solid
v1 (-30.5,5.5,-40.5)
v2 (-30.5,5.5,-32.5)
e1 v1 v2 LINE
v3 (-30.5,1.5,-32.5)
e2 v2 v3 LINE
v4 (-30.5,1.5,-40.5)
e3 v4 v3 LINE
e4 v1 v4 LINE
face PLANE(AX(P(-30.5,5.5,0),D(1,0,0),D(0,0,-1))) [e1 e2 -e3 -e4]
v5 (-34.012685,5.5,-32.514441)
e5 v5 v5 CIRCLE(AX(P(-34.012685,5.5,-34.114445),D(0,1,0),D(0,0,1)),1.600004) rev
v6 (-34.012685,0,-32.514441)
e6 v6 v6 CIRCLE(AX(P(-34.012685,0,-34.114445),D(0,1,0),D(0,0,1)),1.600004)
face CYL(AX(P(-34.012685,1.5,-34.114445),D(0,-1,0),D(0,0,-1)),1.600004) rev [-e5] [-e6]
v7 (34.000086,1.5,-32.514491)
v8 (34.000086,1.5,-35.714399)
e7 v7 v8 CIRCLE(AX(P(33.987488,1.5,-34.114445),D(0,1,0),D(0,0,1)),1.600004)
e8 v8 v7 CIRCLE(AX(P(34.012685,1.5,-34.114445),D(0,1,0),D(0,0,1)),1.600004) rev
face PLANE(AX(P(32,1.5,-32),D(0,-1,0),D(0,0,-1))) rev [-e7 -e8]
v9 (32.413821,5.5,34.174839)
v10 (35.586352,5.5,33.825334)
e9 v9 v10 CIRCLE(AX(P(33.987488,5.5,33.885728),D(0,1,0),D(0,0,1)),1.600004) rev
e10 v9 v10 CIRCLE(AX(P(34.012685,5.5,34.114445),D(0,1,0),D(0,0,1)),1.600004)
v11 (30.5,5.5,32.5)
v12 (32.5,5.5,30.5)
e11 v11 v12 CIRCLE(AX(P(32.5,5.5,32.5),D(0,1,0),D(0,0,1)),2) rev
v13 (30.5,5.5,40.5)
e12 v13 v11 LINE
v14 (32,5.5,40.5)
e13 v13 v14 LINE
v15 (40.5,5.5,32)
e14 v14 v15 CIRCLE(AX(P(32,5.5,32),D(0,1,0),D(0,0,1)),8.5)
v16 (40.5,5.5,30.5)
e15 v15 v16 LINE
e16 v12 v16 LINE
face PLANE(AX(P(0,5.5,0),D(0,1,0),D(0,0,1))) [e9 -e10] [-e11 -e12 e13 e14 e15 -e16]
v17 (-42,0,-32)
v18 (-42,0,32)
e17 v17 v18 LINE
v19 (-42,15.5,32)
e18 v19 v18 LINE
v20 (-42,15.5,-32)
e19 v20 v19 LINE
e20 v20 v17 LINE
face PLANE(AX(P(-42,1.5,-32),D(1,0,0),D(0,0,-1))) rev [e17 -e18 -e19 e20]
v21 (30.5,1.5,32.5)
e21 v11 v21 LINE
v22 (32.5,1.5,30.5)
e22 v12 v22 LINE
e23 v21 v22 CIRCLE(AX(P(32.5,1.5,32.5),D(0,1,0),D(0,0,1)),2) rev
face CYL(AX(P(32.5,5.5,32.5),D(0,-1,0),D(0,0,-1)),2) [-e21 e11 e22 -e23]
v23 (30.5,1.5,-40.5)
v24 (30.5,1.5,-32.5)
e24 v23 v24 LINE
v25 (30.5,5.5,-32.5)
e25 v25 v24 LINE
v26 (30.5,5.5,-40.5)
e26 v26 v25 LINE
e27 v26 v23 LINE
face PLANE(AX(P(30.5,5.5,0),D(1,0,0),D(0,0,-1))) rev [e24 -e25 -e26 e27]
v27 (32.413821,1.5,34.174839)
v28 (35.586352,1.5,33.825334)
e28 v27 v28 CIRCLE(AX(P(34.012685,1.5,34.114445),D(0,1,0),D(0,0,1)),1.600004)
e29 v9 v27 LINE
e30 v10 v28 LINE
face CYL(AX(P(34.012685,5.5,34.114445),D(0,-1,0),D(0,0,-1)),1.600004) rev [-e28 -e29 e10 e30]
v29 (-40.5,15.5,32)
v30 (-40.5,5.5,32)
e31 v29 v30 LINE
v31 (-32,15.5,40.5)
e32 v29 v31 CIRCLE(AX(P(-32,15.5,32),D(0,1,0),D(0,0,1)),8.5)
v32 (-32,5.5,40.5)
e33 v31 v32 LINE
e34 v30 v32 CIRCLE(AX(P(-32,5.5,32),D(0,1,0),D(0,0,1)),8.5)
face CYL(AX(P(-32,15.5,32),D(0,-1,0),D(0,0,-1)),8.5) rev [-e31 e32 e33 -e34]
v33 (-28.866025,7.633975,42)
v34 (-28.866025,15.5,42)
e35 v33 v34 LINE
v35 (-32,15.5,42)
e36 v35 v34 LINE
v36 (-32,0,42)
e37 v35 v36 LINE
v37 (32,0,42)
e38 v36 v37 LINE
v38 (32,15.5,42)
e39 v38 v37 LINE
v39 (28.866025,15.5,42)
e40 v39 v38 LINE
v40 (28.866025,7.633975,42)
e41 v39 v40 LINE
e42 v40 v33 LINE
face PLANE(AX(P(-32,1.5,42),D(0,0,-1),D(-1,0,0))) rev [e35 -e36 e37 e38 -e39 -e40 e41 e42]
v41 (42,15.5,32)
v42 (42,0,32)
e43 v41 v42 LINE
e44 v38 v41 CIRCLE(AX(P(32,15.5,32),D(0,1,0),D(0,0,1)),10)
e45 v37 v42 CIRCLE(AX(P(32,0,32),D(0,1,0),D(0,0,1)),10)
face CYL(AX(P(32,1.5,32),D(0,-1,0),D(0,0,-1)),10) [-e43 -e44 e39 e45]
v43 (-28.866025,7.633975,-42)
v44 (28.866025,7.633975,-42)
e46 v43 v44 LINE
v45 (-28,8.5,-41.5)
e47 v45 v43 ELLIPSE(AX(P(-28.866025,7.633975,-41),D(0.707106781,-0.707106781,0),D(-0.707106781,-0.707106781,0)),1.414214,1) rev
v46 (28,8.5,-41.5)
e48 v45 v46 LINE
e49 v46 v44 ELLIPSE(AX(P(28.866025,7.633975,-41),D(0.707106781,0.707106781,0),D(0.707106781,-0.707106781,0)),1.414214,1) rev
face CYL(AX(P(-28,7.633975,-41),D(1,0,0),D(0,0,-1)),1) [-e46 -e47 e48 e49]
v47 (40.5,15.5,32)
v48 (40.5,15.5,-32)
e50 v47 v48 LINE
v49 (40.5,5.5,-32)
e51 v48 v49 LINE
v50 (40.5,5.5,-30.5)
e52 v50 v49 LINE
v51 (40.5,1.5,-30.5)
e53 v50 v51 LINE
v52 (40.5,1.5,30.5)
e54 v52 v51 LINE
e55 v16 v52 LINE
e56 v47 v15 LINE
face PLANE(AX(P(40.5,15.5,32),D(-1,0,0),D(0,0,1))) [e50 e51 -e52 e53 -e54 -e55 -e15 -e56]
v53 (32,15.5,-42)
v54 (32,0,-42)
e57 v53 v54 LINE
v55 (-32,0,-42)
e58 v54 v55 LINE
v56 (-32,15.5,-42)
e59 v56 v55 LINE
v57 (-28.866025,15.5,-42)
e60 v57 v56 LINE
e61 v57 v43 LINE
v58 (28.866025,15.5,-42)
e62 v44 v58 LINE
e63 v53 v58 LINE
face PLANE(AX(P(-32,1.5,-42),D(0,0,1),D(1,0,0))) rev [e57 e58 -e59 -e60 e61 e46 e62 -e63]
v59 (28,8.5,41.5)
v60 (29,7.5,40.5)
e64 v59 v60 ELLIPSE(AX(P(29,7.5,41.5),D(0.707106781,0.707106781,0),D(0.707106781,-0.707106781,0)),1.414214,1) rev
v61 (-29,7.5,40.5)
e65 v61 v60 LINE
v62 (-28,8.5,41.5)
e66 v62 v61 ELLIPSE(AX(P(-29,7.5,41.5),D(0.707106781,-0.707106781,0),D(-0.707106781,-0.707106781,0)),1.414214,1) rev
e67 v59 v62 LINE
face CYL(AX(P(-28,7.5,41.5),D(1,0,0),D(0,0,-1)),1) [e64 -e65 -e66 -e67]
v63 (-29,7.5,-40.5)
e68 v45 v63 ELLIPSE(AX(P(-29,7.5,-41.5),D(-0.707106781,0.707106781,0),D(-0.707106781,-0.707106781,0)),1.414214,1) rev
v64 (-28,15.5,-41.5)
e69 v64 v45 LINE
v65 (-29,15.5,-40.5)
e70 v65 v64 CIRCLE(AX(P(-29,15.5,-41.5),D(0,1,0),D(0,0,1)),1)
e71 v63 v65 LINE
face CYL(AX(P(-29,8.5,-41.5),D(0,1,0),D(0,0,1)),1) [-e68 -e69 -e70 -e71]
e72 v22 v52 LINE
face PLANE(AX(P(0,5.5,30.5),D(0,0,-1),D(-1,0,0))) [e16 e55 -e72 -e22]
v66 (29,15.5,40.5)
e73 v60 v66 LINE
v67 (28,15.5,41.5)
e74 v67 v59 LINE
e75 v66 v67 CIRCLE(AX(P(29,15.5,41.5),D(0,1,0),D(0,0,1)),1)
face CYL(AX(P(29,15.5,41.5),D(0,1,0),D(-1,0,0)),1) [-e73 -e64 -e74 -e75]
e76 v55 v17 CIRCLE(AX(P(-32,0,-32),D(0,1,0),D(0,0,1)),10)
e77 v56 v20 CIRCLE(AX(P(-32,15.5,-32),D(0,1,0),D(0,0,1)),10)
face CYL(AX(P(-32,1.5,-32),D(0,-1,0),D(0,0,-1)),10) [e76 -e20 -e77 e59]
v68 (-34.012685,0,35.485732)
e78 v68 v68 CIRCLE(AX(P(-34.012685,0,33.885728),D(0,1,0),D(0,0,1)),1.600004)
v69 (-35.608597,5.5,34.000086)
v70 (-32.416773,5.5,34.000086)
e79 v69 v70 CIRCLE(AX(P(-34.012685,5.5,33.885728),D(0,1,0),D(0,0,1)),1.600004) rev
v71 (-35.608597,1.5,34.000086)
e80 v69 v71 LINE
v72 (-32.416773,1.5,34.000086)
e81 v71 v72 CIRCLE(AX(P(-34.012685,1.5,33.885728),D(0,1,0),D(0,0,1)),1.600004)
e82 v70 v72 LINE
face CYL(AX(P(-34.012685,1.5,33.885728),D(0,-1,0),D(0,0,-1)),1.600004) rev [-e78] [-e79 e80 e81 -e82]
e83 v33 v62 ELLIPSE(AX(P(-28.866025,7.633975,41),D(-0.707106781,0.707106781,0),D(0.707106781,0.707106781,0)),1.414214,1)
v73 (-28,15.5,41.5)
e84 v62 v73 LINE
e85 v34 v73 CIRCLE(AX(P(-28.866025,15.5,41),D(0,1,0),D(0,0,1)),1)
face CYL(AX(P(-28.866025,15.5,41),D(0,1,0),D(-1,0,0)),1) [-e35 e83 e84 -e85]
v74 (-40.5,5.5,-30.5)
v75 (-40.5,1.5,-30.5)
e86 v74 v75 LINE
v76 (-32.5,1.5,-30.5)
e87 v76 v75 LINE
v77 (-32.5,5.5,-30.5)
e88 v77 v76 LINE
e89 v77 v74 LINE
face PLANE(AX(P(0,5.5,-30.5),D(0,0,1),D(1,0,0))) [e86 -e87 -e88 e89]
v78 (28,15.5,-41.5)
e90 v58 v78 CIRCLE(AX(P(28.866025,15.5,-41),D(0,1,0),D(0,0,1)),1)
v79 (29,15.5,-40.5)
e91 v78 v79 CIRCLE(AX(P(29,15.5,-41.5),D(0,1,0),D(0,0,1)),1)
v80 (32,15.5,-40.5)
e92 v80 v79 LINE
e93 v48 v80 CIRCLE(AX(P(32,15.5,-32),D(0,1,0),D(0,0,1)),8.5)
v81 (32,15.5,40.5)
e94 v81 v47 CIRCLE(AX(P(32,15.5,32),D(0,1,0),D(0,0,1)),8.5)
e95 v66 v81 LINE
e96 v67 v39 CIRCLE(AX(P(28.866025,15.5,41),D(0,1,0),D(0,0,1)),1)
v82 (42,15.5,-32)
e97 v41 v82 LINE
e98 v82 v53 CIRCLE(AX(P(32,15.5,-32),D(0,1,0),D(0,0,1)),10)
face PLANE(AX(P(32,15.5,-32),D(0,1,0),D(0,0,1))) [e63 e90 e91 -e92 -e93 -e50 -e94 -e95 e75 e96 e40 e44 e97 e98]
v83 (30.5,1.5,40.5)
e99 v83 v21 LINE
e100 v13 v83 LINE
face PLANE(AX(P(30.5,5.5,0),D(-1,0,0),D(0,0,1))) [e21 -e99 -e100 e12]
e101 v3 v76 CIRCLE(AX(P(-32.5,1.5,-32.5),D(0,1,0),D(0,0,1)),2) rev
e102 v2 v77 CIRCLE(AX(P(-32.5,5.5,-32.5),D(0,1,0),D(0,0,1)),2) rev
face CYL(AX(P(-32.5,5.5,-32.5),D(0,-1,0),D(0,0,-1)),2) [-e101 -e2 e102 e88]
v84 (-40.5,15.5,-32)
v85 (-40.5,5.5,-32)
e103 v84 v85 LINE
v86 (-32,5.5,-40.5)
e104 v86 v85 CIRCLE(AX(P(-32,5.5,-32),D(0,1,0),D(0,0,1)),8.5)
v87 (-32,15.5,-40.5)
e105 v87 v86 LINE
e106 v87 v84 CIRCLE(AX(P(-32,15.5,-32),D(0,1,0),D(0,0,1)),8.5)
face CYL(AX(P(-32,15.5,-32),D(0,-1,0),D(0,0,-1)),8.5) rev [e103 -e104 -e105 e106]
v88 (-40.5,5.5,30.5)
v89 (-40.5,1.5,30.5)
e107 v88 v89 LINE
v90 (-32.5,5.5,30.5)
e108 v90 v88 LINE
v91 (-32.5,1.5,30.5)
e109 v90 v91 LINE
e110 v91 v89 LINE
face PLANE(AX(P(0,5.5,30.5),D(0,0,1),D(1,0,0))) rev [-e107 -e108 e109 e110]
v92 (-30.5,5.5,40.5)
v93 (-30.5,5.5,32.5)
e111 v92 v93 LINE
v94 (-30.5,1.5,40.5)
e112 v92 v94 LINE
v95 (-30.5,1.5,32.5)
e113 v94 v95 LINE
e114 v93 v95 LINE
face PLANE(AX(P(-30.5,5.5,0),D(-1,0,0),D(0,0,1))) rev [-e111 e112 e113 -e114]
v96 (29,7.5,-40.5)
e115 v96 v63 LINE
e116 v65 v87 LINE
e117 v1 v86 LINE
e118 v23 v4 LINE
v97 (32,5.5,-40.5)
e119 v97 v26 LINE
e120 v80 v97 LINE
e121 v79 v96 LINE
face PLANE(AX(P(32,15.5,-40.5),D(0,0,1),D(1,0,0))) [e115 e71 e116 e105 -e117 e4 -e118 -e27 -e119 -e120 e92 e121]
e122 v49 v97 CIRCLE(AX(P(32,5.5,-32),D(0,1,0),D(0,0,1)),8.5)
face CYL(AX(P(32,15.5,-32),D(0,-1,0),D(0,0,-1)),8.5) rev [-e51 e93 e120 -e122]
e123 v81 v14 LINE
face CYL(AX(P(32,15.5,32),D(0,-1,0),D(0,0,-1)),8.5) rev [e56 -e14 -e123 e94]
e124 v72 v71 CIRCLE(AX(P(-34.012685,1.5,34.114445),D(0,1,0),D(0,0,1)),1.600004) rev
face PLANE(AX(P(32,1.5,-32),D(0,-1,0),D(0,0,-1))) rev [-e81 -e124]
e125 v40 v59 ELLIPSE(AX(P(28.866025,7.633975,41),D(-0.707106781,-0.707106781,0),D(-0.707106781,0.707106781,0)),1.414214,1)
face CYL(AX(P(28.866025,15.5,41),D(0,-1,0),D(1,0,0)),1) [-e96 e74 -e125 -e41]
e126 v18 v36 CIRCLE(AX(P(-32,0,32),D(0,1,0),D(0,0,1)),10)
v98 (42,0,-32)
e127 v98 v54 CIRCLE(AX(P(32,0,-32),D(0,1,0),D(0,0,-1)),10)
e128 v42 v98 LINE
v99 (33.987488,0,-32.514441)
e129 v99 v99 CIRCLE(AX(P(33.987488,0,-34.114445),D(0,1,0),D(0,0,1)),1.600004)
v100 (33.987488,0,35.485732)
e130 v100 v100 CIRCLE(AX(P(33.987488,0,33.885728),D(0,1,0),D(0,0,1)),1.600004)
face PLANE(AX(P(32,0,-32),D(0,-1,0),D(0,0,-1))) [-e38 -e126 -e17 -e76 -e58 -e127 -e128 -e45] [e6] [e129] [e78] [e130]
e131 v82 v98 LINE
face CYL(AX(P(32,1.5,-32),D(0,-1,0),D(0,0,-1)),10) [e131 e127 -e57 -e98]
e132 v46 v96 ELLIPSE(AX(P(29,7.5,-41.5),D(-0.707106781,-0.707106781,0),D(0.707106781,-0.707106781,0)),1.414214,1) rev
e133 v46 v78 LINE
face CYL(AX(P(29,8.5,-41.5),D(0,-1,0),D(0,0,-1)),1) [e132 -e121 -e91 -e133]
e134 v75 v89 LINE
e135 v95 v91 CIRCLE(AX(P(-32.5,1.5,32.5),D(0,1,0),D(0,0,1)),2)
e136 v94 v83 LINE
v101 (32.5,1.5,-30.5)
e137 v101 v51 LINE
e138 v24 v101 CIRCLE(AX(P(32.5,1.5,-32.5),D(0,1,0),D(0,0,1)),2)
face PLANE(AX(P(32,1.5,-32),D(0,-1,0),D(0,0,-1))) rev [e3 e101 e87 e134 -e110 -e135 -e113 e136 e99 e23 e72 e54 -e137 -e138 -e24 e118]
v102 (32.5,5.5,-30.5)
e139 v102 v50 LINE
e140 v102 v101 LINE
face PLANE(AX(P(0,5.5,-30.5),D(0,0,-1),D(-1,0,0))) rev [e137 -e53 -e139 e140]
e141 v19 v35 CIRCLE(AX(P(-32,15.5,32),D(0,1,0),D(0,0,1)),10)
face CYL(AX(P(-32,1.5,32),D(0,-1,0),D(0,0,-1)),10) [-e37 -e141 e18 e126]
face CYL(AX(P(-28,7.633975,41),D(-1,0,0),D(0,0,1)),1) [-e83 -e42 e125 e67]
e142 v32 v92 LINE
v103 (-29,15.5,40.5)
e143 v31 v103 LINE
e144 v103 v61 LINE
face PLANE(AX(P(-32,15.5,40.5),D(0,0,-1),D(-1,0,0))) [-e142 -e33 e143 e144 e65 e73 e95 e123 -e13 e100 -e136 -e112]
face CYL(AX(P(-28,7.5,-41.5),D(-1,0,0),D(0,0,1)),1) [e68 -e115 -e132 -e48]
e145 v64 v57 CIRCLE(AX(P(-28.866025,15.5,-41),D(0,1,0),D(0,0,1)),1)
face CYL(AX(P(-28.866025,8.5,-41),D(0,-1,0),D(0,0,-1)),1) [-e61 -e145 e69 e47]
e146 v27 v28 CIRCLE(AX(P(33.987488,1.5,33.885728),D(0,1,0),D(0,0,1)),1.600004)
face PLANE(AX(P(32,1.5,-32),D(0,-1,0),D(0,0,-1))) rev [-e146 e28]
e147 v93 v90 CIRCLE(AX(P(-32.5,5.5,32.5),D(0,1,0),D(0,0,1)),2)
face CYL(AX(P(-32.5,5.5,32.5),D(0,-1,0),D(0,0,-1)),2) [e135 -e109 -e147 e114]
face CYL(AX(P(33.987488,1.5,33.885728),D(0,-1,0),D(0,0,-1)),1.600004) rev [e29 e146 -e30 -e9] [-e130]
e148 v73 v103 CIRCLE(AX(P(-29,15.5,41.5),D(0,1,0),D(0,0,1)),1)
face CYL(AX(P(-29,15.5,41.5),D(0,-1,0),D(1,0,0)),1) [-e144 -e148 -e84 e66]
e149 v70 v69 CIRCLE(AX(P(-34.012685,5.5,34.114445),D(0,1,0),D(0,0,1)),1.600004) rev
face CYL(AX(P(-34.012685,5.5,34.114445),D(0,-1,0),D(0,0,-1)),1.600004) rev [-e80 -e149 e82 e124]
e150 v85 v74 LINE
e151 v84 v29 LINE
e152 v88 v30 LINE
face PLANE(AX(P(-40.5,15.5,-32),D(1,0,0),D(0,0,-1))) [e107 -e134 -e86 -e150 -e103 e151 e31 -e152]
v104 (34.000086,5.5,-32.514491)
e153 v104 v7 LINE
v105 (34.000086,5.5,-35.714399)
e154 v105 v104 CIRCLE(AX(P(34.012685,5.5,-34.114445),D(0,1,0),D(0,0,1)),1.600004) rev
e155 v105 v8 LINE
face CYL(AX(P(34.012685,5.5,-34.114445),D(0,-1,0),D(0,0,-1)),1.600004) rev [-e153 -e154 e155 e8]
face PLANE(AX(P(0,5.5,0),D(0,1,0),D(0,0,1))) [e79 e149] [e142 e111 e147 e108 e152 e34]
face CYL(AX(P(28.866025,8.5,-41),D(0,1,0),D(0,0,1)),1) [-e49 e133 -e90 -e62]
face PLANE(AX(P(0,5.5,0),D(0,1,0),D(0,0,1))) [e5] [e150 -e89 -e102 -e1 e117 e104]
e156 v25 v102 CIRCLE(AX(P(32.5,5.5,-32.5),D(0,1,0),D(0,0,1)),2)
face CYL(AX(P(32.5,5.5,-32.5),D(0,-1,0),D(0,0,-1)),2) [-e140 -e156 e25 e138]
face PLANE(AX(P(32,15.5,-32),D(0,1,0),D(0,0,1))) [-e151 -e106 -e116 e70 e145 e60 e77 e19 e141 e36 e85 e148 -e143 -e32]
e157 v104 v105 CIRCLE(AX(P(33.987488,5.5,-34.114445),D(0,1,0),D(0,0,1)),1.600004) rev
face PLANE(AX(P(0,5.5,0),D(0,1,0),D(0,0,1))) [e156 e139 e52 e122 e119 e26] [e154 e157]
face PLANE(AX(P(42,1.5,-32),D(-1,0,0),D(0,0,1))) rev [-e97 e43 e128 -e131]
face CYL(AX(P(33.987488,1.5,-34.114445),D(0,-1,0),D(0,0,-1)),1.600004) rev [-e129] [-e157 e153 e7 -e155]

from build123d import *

# Parameters (mm, degrees)
EXTRUDE_1_DEPTH     = 1.5
EXTRUDE_2_DEPTH     = 14
EXTRUDE_3_OUTLINE_R = 1.60000381
EXTRUDE_3_DEPTH     = 4
SKETCH_4_W          = 56
SKETCH_4_H          = 7
CUT_EXTRUDE_1_DEPTH = 2
SKETCH_5_W          = 56
SKETCH_5_H          = 7
CUT_EXTRUDE_2_DEPTH = 2
FILLET_1_R          = 1
FILLET_2_R          = 1


with BuildPart() as part:
    # 草图1 → 凸台-拉伸1 (new body)
    with BuildSketch(Plane(origin=(0, 0, 0), x_dir=(1, 0, 0), z_dir=(0, 1, 0))):
        with BuildLine():
            Line((-32, 42), (32, 42))
            ThreePointArc((32, 42), (39.071067812, 39.071067812), (42, 32))
            Line((42, 32), (42, -32))
            ThreePointArc((42, -32), (39.071067812, -39.071067812), (32, -42))
            Line((32, -42), (-32, -42))
            ThreePointArc((-32, -42), (-39.071067812, -39.071067812), (-42, -32))
            Line((-42, -32), (-42, 32))
            ThreePointArc((-42, 32), (-39.071067812, 39.071067812), (-32, 42))
        make_face()
        with BuildLine():
            ThreePointArc((-32.412680975, -33.885727711), (-34.012684785, -32.285723901), (-35.612688595, -33.885727711))
            ThreePointArc((-35.612688595, -33.885727711), (-34.012684785, -35.485731521), (-32.412680975, -33.885727711))
        make_face(mode=Mode.SUBTRACT)
        with BuildLine():
            ThreePointArc((35.587491745, -33.885727711), (33.987487935, -32.285723901), (32.387484125, -33.885727711))
            ThreePointArc((32.387484125, -33.885727711), (33.987487935, -35.485731521), (35.587491745, -33.885727711))
        make_face(mode=Mode.SUBTRACT)
        with BuildLine():
            ThreePointArc((35.587491745, 34.114445009), (33.987487935, 35.714448819), (32.387484125, 34.114445009))
            ThreePointArc((32.387484125, 34.114445009), (33.987487935, 32.514441199), (35.587491745, 34.114445009))
        make_face(mode=Mode.SUBTRACT)
        with BuildLine():
            ThreePointArc((-32.412680975, 34.114445009), (-34.012684785, 35.714448819), (-35.612688595, 34.114445009))
            ThreePointArc((-35.612688595, 34.114445009), (-34.012684785, 32.514441199), (-32.412680975, 34.114445009))
        make_face(mode=Mode.SUBTRACT)
    extrude(amount=EXTRUDE_1_DEPTH)

    # 草图2 → 凸台-拉伸2 (add)
    with BuildSketch(Plane(origin=(0, 1.5, 0), x_dir=(1, 0, 0), z_dir=(0, 1, 0))):
        with BuildLine():
            Line((32, 42), (-32, 42))
            ThreePointArc((-32, 42), (-39.071067812, 39.071067812), (-42, 32))
            Line((-42, 32), (-42, -32))
            ThreePointArc((-42, -32), (-39.071067812, -39.071067812), (-32, -42))
            Line((-32, -42), (32, -42))
            ThreePointArc((32, -42), (39.071067812, -39.071067812), (42, -32))
            Line((42, -32), (42, 32))
            ThreePointArc((42, 32), (39.071067812, 39.071067812), (32, 42))
        make_face()
        with BuildLine():
            Line((-40.5, 32), (-40.5, -32))
            ThreePointArc((-40.5, -32), (-38.01040764, -38.01040764), (-32, -40.5))
            Line((-32, -40.5), (32, -40.5))
            ThreePointArc((32, -40.5), (38.01040764, -38.01040764), (40.5, -32))
            Line((40.5, -32), (40.5, 32))
            ThreePointArc((40.5, 32), (38.01040764, 38.01040764), (32, 40.5))
            Line((32, 40.5), (-32, 40.5))
            ThreePointArc((-32, 40.5), (-38.01040764, 38.01040764), (-40.5, 32))
        make_face(mode=Mode.SUBTRACT)
    extrude(amount=EXTRUDE_2_DEPTH)

    # 凸台-拉伸3: read off the stored shape, not the designer's step
    # 凸台-拉伸3 outline → 凸台-拉伸3 (add)
    # profile 1 of 4: a face of its own
    with BuildSketch(Plane(origin=(0, 1.5, 0), x_dir=(1, 0, 0), z_dir=(0, 1, 0))):
        with BuildLine():
            ThreePointArc((-32.5, 30.5), (-31.085786438, 31.085786438), (-30.5, 32.5))
            Line((-30.5, 32.5), (-30.5, 40.5))
            Line((-30.5, 40.5), (-32, 40.5))
            ThreePointArc((-32, 40.5), (-38.01040764, 38.01040764), (-40.5, 32))
            Line((-40.5, 32), (-40.5, 30.5))
            Line((-40.5, 30.5), (-32.5, 30.5))
        make_face()
        with Locations((-34.012684785, 34.114445009)):
            Circle(EXTRUDE_3_OUTLINE_R, mode=Mode.SUBTRACT)
    # profile 2 of 4: a face of its own
    with BuildSketch(Plane(origin=(0, 1.5, 0), x_dir=(1, 0, 0), z_dir=(0, 1, 0))):
        with BuildLine():
            Line((32, 40.5), (30.5, 40.5))
            Line((30.5, 40.5), (30.5, 32.5))
            ThreePointArc((30.5, 32.5), (31.085786438, 31.085786438), (32.5, 30.5))
            Line((32.5, 30.5), (40.5, 30.5))
            Line((40.5, 30.5), (40.5, 32))
            ThreePointArc((40.5, 32), (38.01040764, 38.01040764), (32, 40.5))
        make_face()
        with BuildLine():
            ThreePointArc((34.00008636, 32.5144908), (32.387484125, 34.114445009), (34.00008636, 35.714399218))
            ThreePointArc((34.00008636, 35.714399218), (35.612688595, 34.114445009), (34.00008636, 32.5144908))
        make_face(mode=Mode.SUBTRACT)
    # profile 3 of 4: a face of its own
    with BuildSketch(Plane(origin=(0, 1.5, 0), x_dir=(1, 0, 0), z_dir=(0, 1, 0))):
        with BuildLine():
            Line((-32.5, -30.5), (-40.5, -30.5))
            Line((-40.5, -30.5), (-40.5, -32))
            ThreePointArc((-40.5, -32), (-38.01040764, -38.01040764), (-32, -40.5))
            Line((-32, -40.5), (-30.5, -40.5))
            Line((-30.5, -40.5), (-30.5, -32.5))
            ThreePointArc((-30.5, -32.5), (-31.085786438, -31.085786438), (-32.5, -30.5))
        make_face()
        with BuildLine():
            ThreePointArc((-35.608596528, -34.00008636), (-34.012684785, -32.285723901), (-32.416773042, -34.00008636))
            ThreePointArc((-32.416773042, -34.00008636), (-34.012684785, -35.714448819), (-35.608596528, -34.00008636))
        make_face(mode=Mode.SUBTRACT)
    # profile 4 of 4: a face of its own
    with BuildSketch(Plane(origin=(0, 1.5, 0), x_dir=(1, 0, 0), z_dir=(0, 1, 0))):
        with BuildLine():
            Line((40.5, -32), (40.5, -30.5))
            Line((40.5, -30.5), (32.5, -30.5))
            ThreePointArc((32.5, -30.5), (31.085786438, -31.085786438), (30.5, -32.5))
            Line((30.5, -32.5), (30.5, -40.5))
            Line((30.5, -40.5), (32, -40.5))
            ThreePointArc((32, -40.5), (38.01040764, -38.01040764), (40.5, -32))
        make_face()
        with BuildLine():
            ThreePointArc((32.413821191, -34.174838714), (33.81228204, -32.295345654), (35.586351529, -33.825334006))
            ThreePointArc((35.586351529, -33.825334006), (34.18789068, -35.704827066), (32.413821191, -34.174838714))
        make_face(mode=Mode.SUBTRACT)
    extrude(amount=EXTRUDE_3_DEPTH)

    # 草图4 → 切除-拉伸1 (cut)
    with BuildSketch(Plane.XY.offset(42)):
        with Locations((0, 12)):
            Rectangle(SKETCH_4_W, SKETCH_4_H)
    extrude(amount=-CUT_EXTRUDE_1_DEPTH, mode=Mode.SUBTRACT)

    # 草图5 → 切除-拉伸2 (cut)
    with BuildSketch(Plane(origin=(0, 0, -42), x_dir=(-1, 0, 0), z_dir=(0, 0, -1))):
        with Locations((0, 12)):
            Rectangle(SKETCH_5_W, SKETCH_5_H)
    extrude(amount=-CUT_EXTRUDE_2_DEPTH, mode=Mode.SUBTRACT)

    # 圆角1
    fillet_1_edges = [part.edges().sort_by_distance(p)[0] for p in [
        (0, 8.5, 40.5),
        (28, 12, 40.5),
        (-28, 12, 40.5),
        (0, 8.5, -40.5),
        (-28, 12, -40.5),
        (28, 12, -40.5),
    ]]
    fillet(fillet_1_edges, radius=FILLET_1_R)

    # 圆角2
    # the kernel refuses this fillet: 1 mm, written as the material it takes off along each edge
    with BuildSketch(Plane(origin=(-28, 17.665063509, 42), x_dir=(-1, 0, 0), z_dir=(0, -1, 0))) as fillet_2_piece_1:
        with BuildLine():
            CenterArc((0.866025404, 1), FILLET_2_R, 210, 60)
            Line((0, 0.5), (-0.017320508, 0.49))
            ThreePointArc((-0.017320508, 0.49), (-0.02, 0.25), (-0.02, 0))
            Line((-0.02, 0), (0, -0.02))
            Line((0, -0.02), (0.866025404, -0.02))
            Line((0.866025404, -0.02), (0.866025404, 0))
        make_face()
    extrude(amount=9.165063509, mode=Mode.SUBTRACT)
    with BuildSketch(Plane(origin=(-28, 8.5, 42), x_dir=(0, -1, 0), z_dir=(1, 0, 0))) as fillet_2_piece_2:
        with BuildLine():
            CenterArc((0.866025404, 1), FILLET_2_R, 210, 60)
            Line((0, 0.5), (-0.017320508, 0.49))
            ThreePointArc((-0.017320508, 0.49), (-0.02, 0.25), (-0.02, 0))
            Line((-0.02, 0), (0, -0.02))
            Line((0, -0.02), (0.866025404, -0.02))
            Line((0.866025404, -0.02), (0.866025404, 0))
        make_face()
    extrude(amount=56, mode=Mode.SUBTRACT)
    with BuildSketch(Plane(origin=(28, 8.5, 42), x_dir=(0, 0, -1), z_dir=(0, 1, 0))) as fillet_2_piece_3:
        with BuildLine():
            CenterArc((1, -0.866025404), FILLET_2_R, 120, 60)
            Line((0, -0.866025404), (-0.02, -0.866025404))
            Line((-0.02, -0.866025404), (-0.02, 0))
            Line((-0.02, 0), (0, 0.02))
            ThreePointArc((0, 0.02), (0.25, 0.02), (0.49, 0.017320508))
            Line((0.49, 0.017320508), (0.5, 0))
        make_face()
    extrude(amount=9.165063509, mode=Mode.SUBTRACT)
    with BuildSketch(Plane(origin=(-28, 17.665063509, -42), x_dir=(-1, 0, 0), z_dir=(0, -1, 0)), Plane(origin=(28, 8.5, -42), x_dir=(1, 0, 0), z_dir=(0, 1, 0))) as fillet_2_piece_4:
        with BuildLine():
            CenterArc((0.866025404, -1), FILLET_2_R, 90, 60)
            Line((0, -0.5), (-0.017320508, -0.49))
            ThreePointArc((-0.017320508, -0.49), (-0.02, -0.25), (-0.02, 0))
            Line((-0.02, 0), (0, 0.02))
            Line((0, 0.02), (0.866025404, 0.02))
            Line((0.866025404, 0.02), (0.866025404, 0))
        make_face()
    extrude(amount=9.165063509, mode=Mode.SUBTRACT)
    with BuildSketch(Plane(origin=(-28, 8.5, -42), x_dir=(0, -1, 0), z_dir=(1, 0, 0))) as fillet_2_piece_5:
        with BuildLine():
            CenterArc((0.866025404, -1), FILLET_2_R, 90, 60)
            Line((0, -0.5), (-0.017320508, -0.49))
            ThreePointArc((-0.017320508, -0.49), (-0.02, -0.25), (-0.02, 0))
            Line((-0.02, 0), (0, 0.02))
            Line((0, 0.02), (0.866025404, 0.02))
            Line((0.866025404, 0.02), (0.866025404, 0))
        make_face()
    extrude(amount=56, mode=Mode.SUBTRACT)
    with BuildSketch(Plane(origin=(-28, 17.665063509, 42), x_dir=(-1, 0, 0), z_dir=(0, -1, 0))) as fillet_2_piece_6a_section:
        with BuildLine():
            CenterArc((0.866025404, 1), FILLET_2_R, 210, 60)
            Line((0, 0.5), (-0.017320508, 0.49))
            ThreePointArc((-0.017320508, 0.49), (-0.02, 0.25), (-0.02, 0))
            Line((-0.02, 0), (0, -0.02))
            Line((0, -0.02), (0.866025404, -0.02))
            Line((0.866025404, -0.02), (0.866025404, 0))
        make_face()
    fillet_2_piece_6a = extrude(amount=11.330127019, mode=Mode.PRIVATE)
    fillet_2_piece_6a = split(fillet_2_piece_6a, bisect_by=Plane(origin=(-28, 8.5, 42), z_dir=(0, -1, 0)), keep=Keep.TOP, mode=Mode.PRIVATE)
    with BuildSketch(Plane(origin=(-30.165063509, 8.5, 42), x_dir=(0, -1, 0), z_dir=(1, 0, 0))) as fillet_2_piece_6b_section:
        with BuildLine():
            CenterArc((0.866025404, 1), FILLET_2_R, 210, 60)
            Line((0, 0.5), (-0.017320508, 0.49))
            ThreePointArc((-0.017320508, 0.49), (-0.02, 0.25), (-0.02, 0))
            Line((-0.02, 0), (0, -0.02))
            Line((0, -0.02), (0.866025404, -0.02))
            Line((0.866025404, -0.02), (0.866025404, 0))
        make_face()
    fillet_2_piece_6b = extrude(amount=58.165063509, mode=Mode.PRIVATE)
    fillet_2_piece_6b = split(fillet_2_piece_6b, bisect_by=Plane(origin=(-28, 8.5, 42), z_dir=(-1, 0, 0)), keep=Keep.TOP, mode=Mode.PRIVATE)
    fillet_2_piece_6 = fillet_2_piece_6a & fillet_2_piece_6b
    add(fillet_2_piece_6, mode=Mode.SUBTRACT)
    with BuildSketch(Plane(origin=(28, 6.334936491, 42), x_dir=(0, 0, -1), z_dir=(0, 1, 0))) as fillet_2_piece_7a_section:
        with BuildLine():
            CenterArc((1, -0.866025404), FILLET_2_R, 120, 60)
            Line((0, -0.866025404), (-0.02, -0.866025404))
            Line((-0.02, -0.866025404), (-0.02, 0))
            Line((-0.02, 0), (0, 0.02))
            ThreePointArc((0, 0.02), (0.25, 0.02), (0.49, 0.017320508))
            Line((0.49, 0.017320508), (0.5, 0))
        make_face()
    fillet_2_piece_7a = extrude(amount=11.330127019, mode=Mode.PRIVATE)
    fillet_2_piece_7a = split(fillet_2_piece_7a, bisect_by=Plane(origin=(28, 8.5, 42), z_dir=(0, -1, 0)), keep=Keep.TOP, mode=Mode.PRIVATE)
    with BuildSketch(Plane(origin=(-28, 8.5, 42), x_dir=(0, -1, 0), z_dir=(1, 0, 0))) as fillet_2_piece_7b_section:
        with BuildLine():
            CenterArc((0.866025404, 1), FILLET_2_R, 210, 60)
            Line((0, 0.5), (-0.017320508, 0.49))
            ThreePointArc((-0.017320508, 0.49), (-0.02, 0.25), (-0.02, 0))
            Line((-0.02, 0), (0, -0.02))
            Line((0, -0.02), (0.866025404, -0.02))
            Line((0.866025404, -0.02), (0.866025404, 0))
        make_face()
    fillet_2_piece_7b = extrude(amount=58.165063509, mode=Mode.PRIVATE)
    fillet_2_piece_7b = split(fillet_2_piece_7b, bisect_by=Plane(origin=(28, 8.5, 42), z_dir=(1, 0, 0)), keep=Keep.TOP, mode=Mode.PRIVATE)
    fillet_2_piece_7 = fillet_2_piece_7a & fillet_2_piece_7b
    add(fillet_2_piece_7, mode=Mode.SUBTRACT)
    with BuildSketch(Plane(origin=(-30.165063509, 8.5, -42), x_dir=(0, -1, 0), z_dir=(1, 0, 0))) as fillet_2_piece_8a_section:
        with BuildLine():
            CenterArc((0.866025404, -1), FILLET_2_R, 90, 60)
            Line((0, -0.5), (-0.017320508, -0.49))
            ThreePointArc((-0.017320508, -0.49), (-0.02, -0.25), (-0.02, 0))
            Line((-0.02, 0), (0, 0.02))
            Line((0, 0.02), (0.866025404, 0.02))
            Line((0.866025404, 0.02), (0.866025404, 0))
        make_face()
    fillet_2_piece_8a = extrude(amount=58.165063509, mode=Mode.PRIVATE)
    fillet_2_piece_8a = split(fillet_2_piece_8a, bisect_by=Plane(origin=(-28, 8.5, -42), z_dir=(-1, 0, 0)), keep=Keep.TOP, mode=Mode.PRIVATE)
    with BuildSketch(Plane(origin=(-28, 17.665063509, -42), x_dir=(-1, 0, 0), z_dir=(0, -1, 0))) as fillet_2_piece_8b_section:
        with BuildLine():
            CenterArc((0.866025404, -1), FILLET_2_R, 90, 60)
            Line((0, -0.5), (-0.017320508, -0.49))
            ThreePointArc((-0.017320508, -0.49), (-0.02, -0.25), (-0.02, 0))
            Line((-0.02, 0), (0, 0.02))
            Line((0, 0.02), (0.866025404, 0.02))
            Line((0.866025404, 0.02), (0.866025404, 0))
        make_face()
    fillet_2_piece_8b = extrude(amount=11.330127019, mode=Mode.PRIVATE)
    fillet_2_piece_8b = split(fillet_2_piece_8b, bisect_by=Plane(origin=(-28, 8.5, -42), z_dir=(0, -1, 0)), keep=Keep.TOP, mode=Mode.PRIVATE)
    fillet_2_piece_8 = fillet_2_piece_8a & fillet_2_piece_8b
    add(fillet_2_piece_8, mode=Mode.SUBTRACT)
    with BuildSketch(Plane(origin=(28, 6.334936491, -42), x_dir=(1, 0, 0), z_dir=(0, 1, 0))) as fillet_2_piece_9a_section:
        with BuildLine():
            CenterArc((0.866025404, -1), FILLET_2_R, 90, 60)
            Line((0, -0.5), (-0.017320508, -0.49))
            ThreePointArc((-0.017320508, -0.49), (-0.02, -0.25), (-0.02, 0))
            Line((-0.02, 0), (0, 0.02))
            Line((0, 0.02), (0.866025404, 0.02))
            Line((0.866025404, 0.02), (0.866025404, 0))
        make_face()
    fillet_2_piece_9a = extrude(amount=11.330127019, mode=Mode.PRIVATE)
    fillet_2_piece_9a = split(fillet_2_piece_9a, bisect_by=Plane(origin=(28, 8.5, -42), z_dir=(0, -1, 0)), keep=Keep.TOP, mode=Mode.PRIVATE)
    with BuildSketch(Plane(origin=(-28, 8.5, -42), x_dir=(0, -1, 0), z_dir=(1, 0, 0))) as fillet_2_piece_9b_section:
        with BuildLine():
            CenterArc((0.866025404, -1), FILLET_2_R, 90, 60)
            Line((0, -0.5), (-0.017320508, -0.49))
            ThreePointArc((-0.017320508, -0.49), (-0.02, -0.25), (-0.02, 0))
            Line((-0.02, 0), (0, 0.02))
            Line((0, 0.02), (0.866025404, 0.02))
            Line((0.866025404, 0.02), (0.866025404, 0))
        make_face()
    fillet_2_piece_9b = extrude(amount=58.165063509, mode=Mode.PRIVATE)
    fillet_2_piece_9b = split(fillet_2_piece_9b, bisect_by=Plane(origin=(28, 8.5, -42), z_dir=(1, 0, 0)), keep=Keep.TOP, mode=Mode.PRIVATE)
    fillet_2_piece_9 = fillet_2_piece_9a & fillet_2_piece_9b
    add(fillet_2_piece_9, mode=Mode.SUBTRACT)


solid = part.part
